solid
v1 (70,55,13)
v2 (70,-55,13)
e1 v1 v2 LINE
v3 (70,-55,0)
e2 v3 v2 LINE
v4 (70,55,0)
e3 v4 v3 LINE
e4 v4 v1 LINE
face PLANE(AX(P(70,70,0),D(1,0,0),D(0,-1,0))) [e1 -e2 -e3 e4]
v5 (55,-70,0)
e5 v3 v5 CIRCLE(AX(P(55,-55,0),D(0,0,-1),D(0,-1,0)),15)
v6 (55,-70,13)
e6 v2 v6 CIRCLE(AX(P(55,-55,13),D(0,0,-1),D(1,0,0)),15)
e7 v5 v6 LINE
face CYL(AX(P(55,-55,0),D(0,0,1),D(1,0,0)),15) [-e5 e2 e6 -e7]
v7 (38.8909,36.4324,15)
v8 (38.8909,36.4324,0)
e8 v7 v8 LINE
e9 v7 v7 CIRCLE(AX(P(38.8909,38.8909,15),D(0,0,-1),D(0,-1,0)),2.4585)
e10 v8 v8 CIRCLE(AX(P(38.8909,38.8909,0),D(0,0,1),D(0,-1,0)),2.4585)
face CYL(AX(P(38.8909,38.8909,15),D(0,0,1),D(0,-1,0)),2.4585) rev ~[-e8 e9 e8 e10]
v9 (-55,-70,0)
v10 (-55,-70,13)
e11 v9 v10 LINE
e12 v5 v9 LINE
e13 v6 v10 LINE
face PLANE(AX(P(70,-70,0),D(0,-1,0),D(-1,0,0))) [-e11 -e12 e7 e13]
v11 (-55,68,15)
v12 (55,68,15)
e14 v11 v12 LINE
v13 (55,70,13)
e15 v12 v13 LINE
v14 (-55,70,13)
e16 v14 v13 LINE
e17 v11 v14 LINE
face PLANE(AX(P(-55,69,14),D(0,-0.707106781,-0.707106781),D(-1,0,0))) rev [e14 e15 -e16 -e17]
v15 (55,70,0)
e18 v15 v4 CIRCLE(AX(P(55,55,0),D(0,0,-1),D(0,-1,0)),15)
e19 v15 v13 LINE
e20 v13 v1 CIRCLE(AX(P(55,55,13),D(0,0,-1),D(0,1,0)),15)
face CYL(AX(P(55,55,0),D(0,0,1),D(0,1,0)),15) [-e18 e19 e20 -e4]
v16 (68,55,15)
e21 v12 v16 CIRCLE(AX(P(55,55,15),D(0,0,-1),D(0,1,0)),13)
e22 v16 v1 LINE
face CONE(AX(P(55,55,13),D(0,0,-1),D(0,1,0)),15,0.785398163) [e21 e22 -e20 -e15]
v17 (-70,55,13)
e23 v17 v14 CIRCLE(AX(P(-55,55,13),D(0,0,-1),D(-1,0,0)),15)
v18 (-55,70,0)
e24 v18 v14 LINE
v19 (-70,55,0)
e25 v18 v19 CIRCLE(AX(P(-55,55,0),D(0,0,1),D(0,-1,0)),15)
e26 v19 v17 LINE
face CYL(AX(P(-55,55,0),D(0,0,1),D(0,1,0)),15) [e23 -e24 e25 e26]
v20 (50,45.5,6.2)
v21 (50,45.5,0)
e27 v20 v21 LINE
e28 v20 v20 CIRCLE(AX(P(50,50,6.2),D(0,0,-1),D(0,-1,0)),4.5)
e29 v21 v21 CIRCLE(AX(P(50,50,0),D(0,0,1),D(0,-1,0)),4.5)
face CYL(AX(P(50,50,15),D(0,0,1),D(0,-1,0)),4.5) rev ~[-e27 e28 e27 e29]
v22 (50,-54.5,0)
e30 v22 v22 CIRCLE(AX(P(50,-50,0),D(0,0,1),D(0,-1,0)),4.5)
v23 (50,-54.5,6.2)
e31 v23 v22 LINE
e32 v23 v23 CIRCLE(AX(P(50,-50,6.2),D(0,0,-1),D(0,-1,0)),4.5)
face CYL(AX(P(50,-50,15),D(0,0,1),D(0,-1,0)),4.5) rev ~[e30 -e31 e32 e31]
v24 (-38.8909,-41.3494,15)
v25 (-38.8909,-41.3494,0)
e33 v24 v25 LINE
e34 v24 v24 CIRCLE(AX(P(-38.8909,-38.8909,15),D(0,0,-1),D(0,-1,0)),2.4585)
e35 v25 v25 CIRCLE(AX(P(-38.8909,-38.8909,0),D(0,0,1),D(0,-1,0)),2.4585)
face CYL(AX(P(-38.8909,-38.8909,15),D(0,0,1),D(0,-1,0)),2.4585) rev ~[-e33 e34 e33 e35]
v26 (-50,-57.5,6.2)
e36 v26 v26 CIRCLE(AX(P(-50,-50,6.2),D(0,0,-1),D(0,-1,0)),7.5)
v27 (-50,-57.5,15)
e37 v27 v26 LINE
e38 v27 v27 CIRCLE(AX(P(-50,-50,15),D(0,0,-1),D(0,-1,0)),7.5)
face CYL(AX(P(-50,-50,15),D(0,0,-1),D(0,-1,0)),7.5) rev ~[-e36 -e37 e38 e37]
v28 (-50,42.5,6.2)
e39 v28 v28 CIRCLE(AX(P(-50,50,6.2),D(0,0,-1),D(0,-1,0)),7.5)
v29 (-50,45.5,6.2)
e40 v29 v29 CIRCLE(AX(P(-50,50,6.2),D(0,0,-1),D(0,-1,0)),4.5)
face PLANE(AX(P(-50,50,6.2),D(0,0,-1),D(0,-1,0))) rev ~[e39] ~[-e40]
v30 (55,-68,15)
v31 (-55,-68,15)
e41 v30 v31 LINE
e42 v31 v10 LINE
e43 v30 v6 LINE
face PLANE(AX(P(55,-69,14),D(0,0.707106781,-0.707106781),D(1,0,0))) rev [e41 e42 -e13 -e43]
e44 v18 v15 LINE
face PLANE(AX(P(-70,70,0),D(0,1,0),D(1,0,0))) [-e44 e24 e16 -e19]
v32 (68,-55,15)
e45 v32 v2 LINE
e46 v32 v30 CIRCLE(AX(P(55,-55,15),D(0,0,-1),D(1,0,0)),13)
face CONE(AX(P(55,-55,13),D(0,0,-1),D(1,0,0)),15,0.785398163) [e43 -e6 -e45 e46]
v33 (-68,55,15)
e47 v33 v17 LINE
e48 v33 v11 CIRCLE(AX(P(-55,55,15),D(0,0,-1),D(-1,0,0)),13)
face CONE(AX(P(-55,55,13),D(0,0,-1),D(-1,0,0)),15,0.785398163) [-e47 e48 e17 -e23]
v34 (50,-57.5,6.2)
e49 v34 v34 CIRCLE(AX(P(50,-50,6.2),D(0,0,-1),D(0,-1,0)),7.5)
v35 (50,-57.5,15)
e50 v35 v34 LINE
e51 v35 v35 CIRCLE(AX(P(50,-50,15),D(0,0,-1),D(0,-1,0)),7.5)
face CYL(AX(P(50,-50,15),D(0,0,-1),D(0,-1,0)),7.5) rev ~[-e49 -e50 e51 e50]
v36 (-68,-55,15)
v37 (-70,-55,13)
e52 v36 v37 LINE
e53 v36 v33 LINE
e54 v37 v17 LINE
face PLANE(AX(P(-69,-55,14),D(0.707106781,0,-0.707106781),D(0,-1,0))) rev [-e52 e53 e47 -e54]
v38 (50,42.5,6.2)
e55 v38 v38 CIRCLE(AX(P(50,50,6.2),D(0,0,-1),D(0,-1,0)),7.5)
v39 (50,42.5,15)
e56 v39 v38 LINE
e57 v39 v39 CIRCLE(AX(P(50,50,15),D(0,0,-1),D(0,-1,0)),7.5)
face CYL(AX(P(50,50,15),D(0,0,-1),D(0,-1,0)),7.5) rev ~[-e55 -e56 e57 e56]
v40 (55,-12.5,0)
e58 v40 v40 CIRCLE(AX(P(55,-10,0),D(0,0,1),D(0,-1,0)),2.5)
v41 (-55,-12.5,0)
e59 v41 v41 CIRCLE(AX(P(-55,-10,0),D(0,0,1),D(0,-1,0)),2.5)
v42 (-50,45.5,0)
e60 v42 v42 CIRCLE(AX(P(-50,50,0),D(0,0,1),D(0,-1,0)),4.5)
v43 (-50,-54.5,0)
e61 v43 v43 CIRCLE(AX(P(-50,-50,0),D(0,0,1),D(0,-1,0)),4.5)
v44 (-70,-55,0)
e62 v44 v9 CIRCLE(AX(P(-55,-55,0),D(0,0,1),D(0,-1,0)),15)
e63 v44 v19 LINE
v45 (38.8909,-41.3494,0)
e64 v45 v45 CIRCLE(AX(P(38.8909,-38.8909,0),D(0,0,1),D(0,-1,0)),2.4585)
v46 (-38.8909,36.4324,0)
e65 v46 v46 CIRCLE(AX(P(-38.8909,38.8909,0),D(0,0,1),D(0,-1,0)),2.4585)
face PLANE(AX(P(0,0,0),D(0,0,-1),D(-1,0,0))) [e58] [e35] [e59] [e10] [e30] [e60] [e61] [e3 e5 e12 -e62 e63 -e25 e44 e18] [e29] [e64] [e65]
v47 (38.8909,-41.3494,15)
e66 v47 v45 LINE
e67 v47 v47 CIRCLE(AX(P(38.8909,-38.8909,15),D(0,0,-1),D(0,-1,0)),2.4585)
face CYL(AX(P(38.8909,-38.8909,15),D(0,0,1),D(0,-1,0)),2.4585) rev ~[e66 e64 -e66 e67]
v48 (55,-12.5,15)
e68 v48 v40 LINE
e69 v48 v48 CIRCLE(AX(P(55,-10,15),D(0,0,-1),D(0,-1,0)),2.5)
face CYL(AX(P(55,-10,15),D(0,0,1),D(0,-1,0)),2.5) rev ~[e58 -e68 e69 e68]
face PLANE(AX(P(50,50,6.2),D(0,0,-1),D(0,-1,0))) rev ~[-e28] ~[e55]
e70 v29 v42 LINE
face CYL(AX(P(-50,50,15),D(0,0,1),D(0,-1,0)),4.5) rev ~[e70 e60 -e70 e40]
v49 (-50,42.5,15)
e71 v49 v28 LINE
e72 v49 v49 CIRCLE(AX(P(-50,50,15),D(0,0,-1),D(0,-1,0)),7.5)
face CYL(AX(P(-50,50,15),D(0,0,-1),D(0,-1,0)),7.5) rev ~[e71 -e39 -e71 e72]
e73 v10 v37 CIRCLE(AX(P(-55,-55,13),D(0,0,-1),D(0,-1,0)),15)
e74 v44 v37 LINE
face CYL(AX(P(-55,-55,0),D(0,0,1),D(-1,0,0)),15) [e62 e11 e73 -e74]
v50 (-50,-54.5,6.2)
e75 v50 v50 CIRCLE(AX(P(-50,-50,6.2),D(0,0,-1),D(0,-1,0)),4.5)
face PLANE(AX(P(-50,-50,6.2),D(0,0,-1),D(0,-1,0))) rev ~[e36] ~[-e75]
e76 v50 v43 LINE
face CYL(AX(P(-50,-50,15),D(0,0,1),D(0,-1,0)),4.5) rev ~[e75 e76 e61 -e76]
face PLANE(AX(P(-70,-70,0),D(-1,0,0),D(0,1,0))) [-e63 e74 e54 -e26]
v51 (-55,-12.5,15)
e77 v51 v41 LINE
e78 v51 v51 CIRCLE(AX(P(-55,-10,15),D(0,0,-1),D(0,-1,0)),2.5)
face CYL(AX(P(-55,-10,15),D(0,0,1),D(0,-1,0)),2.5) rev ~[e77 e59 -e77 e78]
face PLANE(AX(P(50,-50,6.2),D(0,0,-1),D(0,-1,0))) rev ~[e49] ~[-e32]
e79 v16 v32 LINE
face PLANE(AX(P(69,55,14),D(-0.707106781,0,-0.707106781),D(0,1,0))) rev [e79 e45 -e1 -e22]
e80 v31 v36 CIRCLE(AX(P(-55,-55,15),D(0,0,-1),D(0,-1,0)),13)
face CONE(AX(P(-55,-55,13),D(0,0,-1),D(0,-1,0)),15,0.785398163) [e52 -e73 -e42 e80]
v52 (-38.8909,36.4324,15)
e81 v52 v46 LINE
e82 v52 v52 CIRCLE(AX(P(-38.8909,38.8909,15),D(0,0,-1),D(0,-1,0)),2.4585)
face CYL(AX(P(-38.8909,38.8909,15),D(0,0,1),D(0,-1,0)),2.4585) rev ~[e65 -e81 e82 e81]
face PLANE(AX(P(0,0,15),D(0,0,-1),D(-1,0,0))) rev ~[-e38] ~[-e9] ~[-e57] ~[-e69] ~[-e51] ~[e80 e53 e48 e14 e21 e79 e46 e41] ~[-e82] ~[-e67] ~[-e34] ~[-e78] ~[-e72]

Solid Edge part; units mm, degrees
sketch "Sketch1" plane through (0, 0, 0) normal (0, 0, 1) x (1, 0, 0)
  line L0 (-70, 70) -> (70, 70)
  line L1 (70, 70) -> (70, -70)
  line L2 (70, -70) -> (-70, -70)
  line L3 (-70, -70) -> (-70, 70)
  dimension "D1" = 140
  dimension "D2" = 140
extrude "Protrusion1" add sketch "Sketch1" along normal blind 15
hole "Hole_1" at (38.8909, 38.8909, 15) direction (0, 0, -1) diameter 4.917 end up to next thread major 6 thread length 2
hole "Hole1" at (38.8909, -38.8909, 15) direction (0, 0, -1) diameter 4.917 end up to next thread major 6 thread length 2
hole "Hole2" at (-38.8909, -38.8909, 15) direction (0, 0, -1) diameter 4.917 end up to next thread major 6 thread length 2
hole "Hole3" at (-38.8909, 38.8909, 15) direction (0, 0, -1) diameter 4.917 end up to next thread major 6 thread length 2
hole "Hole_5" at (50, 50, 15) direction (0, 0, -1) diameter 9 end up to next counterbore diameter 15 counterbore depth 8.8
hole "Hole4" at (-50, 50, 15) direction (0, 0, -1) diameter 9 end up to next counterbore diameter 15 counterbore depth 8.8
hole "Hole5" at (-50, -50, 15) direction (0, 0, -1) diameter 9 end up to next counterbore diameter 15 counterbore depth 8.8
hole "Hole6" at (50, -50, 15) direction (0, 0, -1) diameter 9 end up to next counterbore diameter 15 counterbore depth 8.8
hole "Hole_9" at (55, -10, 15) direction (0, 0, -1) diameter 5 end up to next
hole "Hole7" at (-55, -10, 15) direction (0, 0, -1) diameter 5 end up to next
fillet "Round_1" radius 15 4 edges at (-70, 70, 7.5) (70, -70, 7.5) (-70, -70, 7.5) (70, 70, 7.5)
chamfer "Chamfer_2" distance 2 angle 45 7 edges at (-70, 0, 15) (0, 70, 15) (65.6066, 65.6066, 15) (70, 0, 15) (65.6066, -65.6066, 15) (0, -70, 15) (-65.6066, -65.6066, 15)
